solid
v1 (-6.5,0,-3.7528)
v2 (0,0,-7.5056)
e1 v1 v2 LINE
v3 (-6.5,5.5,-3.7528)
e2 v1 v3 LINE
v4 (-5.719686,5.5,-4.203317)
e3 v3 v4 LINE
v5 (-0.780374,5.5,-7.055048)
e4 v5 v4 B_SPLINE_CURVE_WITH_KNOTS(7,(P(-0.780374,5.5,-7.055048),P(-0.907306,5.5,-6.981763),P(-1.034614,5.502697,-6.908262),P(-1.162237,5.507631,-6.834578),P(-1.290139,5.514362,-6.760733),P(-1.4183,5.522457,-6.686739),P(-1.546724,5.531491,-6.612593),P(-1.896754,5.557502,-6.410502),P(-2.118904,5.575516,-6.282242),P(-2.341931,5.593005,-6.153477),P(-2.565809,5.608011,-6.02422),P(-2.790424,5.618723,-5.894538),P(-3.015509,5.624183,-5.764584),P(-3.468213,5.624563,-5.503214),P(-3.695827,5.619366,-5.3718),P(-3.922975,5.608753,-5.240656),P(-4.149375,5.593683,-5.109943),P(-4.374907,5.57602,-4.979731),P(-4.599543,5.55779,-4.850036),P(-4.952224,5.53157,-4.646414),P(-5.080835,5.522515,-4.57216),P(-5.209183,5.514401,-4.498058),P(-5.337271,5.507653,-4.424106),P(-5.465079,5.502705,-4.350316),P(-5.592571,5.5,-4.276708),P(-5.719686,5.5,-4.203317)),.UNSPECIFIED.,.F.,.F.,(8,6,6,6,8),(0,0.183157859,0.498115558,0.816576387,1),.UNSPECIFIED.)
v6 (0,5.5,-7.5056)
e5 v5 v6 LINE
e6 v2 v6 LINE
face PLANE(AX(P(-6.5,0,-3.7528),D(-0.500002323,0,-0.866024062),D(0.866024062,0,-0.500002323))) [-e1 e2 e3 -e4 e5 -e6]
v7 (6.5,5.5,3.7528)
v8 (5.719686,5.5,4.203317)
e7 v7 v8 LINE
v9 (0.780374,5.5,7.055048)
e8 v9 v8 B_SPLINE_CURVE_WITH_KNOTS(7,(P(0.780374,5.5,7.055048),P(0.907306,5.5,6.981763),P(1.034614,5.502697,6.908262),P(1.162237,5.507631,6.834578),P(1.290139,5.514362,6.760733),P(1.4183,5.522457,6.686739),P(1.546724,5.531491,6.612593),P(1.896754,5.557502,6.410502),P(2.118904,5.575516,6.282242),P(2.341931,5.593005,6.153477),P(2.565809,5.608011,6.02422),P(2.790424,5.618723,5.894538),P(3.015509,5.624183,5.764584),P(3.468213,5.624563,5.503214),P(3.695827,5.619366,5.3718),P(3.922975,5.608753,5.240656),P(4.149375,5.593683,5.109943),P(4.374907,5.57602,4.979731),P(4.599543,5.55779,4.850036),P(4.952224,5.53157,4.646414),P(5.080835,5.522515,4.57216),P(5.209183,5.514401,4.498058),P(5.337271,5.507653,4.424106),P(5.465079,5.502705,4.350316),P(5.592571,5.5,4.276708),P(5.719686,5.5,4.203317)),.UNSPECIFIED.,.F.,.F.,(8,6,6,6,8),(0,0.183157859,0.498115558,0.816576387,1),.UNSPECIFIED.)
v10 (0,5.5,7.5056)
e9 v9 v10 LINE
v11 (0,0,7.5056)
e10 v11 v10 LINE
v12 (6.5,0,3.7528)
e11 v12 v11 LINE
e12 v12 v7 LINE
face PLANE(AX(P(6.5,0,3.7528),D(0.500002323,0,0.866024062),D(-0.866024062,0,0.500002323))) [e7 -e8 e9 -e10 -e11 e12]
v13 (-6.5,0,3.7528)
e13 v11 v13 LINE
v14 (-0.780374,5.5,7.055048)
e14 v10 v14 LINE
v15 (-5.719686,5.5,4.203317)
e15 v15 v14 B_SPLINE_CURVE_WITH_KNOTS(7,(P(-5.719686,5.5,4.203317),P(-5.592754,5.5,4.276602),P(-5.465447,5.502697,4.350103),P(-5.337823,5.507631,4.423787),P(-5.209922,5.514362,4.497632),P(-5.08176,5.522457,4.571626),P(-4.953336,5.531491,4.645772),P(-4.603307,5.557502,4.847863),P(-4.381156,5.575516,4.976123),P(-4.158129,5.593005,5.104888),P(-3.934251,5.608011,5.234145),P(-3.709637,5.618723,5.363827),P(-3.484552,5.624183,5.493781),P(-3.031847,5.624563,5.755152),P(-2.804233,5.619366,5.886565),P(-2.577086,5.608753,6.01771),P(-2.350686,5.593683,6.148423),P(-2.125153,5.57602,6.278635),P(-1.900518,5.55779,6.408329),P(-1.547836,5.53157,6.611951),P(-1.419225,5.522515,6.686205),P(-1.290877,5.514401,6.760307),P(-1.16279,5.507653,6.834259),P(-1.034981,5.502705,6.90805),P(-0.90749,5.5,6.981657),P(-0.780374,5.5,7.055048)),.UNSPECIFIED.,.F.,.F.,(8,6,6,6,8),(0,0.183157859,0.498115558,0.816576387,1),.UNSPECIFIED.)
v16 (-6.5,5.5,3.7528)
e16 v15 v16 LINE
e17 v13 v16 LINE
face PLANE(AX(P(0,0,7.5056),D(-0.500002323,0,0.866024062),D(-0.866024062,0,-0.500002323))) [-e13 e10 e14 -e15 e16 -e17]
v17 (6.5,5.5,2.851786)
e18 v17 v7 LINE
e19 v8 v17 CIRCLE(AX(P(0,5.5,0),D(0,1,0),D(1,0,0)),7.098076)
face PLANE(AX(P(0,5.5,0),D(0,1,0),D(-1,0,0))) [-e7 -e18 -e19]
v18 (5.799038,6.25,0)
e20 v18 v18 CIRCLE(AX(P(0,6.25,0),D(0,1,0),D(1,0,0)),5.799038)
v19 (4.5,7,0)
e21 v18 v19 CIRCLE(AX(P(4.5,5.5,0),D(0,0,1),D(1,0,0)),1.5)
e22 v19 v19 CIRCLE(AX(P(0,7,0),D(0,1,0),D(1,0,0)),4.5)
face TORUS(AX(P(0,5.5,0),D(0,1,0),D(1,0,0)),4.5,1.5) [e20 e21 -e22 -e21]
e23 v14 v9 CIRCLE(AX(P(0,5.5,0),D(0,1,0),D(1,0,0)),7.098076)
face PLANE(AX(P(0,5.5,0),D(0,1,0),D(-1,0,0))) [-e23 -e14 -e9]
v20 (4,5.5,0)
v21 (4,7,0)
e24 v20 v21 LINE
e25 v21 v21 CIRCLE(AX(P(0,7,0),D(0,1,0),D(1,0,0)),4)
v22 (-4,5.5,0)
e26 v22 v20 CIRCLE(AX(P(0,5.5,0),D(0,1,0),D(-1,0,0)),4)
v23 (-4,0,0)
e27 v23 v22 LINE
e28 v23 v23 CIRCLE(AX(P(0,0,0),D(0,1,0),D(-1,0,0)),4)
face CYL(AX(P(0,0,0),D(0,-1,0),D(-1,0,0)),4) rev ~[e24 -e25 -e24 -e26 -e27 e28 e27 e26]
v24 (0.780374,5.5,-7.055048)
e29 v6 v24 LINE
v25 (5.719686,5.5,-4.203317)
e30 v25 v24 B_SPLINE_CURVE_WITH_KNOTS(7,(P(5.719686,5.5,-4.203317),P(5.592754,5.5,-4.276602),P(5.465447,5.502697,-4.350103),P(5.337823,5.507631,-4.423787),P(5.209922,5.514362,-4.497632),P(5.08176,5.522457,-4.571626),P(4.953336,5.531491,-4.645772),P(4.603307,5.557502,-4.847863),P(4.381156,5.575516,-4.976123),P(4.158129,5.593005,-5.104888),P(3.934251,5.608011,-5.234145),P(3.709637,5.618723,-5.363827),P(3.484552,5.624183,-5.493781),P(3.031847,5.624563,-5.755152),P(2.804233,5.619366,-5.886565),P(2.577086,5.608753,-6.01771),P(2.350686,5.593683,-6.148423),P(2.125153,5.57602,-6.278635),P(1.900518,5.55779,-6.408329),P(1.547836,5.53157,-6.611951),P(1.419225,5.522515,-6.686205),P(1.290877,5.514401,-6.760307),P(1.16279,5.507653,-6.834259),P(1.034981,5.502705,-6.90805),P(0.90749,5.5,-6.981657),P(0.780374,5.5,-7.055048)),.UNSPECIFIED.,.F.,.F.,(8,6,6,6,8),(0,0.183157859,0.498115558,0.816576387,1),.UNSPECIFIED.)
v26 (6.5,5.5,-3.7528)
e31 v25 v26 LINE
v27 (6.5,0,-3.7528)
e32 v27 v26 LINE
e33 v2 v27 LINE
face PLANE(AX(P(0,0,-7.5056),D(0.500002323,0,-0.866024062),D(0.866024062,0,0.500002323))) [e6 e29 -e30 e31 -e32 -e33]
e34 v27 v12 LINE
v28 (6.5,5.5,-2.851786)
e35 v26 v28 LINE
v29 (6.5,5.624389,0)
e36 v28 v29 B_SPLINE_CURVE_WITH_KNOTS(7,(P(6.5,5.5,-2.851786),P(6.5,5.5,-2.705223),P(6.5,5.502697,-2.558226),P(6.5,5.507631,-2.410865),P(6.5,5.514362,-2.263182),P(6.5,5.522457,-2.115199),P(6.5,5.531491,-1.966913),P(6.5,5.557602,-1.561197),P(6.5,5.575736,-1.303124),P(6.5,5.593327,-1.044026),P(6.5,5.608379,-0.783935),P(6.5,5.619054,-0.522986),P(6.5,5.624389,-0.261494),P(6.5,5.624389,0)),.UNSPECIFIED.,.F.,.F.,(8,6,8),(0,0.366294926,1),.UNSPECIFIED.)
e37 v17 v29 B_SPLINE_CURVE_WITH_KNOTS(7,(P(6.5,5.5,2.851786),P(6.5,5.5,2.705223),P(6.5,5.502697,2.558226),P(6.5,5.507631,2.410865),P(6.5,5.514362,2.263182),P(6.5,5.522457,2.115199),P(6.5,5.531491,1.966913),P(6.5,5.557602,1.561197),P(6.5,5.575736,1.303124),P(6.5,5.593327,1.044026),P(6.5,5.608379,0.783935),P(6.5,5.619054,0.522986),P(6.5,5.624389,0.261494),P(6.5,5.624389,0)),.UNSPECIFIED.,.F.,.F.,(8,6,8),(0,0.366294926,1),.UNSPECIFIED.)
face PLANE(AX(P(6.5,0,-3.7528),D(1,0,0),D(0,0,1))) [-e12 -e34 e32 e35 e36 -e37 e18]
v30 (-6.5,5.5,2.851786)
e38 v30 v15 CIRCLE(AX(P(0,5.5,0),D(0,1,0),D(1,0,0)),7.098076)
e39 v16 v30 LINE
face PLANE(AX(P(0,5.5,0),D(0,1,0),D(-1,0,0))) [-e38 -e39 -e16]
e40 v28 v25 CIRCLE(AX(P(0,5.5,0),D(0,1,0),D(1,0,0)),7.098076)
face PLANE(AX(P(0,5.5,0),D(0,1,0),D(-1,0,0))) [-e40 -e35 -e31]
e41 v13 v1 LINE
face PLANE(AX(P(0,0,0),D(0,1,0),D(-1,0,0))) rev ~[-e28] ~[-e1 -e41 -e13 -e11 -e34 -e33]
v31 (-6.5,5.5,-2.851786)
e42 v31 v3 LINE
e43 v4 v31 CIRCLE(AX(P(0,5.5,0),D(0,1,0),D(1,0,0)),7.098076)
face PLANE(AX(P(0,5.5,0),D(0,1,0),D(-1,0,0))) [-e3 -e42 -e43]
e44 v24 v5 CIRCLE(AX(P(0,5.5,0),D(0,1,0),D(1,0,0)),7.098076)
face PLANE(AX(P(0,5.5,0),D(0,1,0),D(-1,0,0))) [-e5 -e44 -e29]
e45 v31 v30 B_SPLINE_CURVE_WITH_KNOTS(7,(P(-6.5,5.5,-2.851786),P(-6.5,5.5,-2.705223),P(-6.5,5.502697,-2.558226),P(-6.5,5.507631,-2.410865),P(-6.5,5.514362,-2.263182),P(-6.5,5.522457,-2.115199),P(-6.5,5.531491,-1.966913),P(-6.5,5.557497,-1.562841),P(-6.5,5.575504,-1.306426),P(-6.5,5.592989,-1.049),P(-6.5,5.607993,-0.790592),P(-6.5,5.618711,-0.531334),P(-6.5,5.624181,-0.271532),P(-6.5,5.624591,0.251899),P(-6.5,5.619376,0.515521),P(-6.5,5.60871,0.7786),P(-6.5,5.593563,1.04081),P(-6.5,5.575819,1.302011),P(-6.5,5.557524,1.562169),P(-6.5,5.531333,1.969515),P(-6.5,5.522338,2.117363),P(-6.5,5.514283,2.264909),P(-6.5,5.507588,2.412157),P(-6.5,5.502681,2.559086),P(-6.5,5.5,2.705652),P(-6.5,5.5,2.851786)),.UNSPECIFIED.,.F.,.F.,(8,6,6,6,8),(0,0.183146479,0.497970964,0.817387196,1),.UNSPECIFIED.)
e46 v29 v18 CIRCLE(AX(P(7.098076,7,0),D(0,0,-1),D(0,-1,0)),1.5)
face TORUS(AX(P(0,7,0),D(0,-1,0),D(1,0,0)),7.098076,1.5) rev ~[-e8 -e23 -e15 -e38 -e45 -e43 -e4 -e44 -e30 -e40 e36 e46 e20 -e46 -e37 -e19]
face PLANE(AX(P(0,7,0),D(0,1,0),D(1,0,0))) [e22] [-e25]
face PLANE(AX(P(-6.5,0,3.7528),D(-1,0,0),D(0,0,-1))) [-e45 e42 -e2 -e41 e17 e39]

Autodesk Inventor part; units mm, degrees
ref_plane "YZ Plane" through (0, 0, 0) normal (1, 0, 0) x (0, 1, 0)
ref_plane "XZ Plane" through (0, 0, 0) normal (0, 1, 0) x (-1, 0, 0)
ref_plane "XY Plane" through (0, 0, 0) normal (0, 0, 1) x (1, 0, 0)
sketch "Sketch1" plane through (0, 0, 0) normal (0, 1, 0) x (-1, 0, 0)
  circle A0 centre (0, 0) radius 4
  line L0 (0, -7.5056) -> (-6.5, -3.7528)
  line L1 (-6.5, -3.7528) -> (-6.5, 3.7528)
  line L2 (-6.5, 3.7528) -> (0, 7.5056)
  line L3 (0, 7.5056) -> (6.5, 3.7528)
  line L4 (6.5, 3.7528) -> (6.5, -3.7528)
  line L5 (6.5, -3.7528) -> (0, -7.5056)
  dimension "d0" = 8
  dimension "d1" = 13
extrude "Extrusion1" add sketch "Sketch1" along normal blind 5.5
sketch "Sketch2" plane through (0, 5.5, 0) normal (0, 1, 0) x (1, 0, 0)
  circle A0 centre (0, 0) radius 4 projected
  circle A1 centre (0, 0) radius 6
  dimension "d6" = 2
extrude "Extrusion2" add sketch "Sketch2" along normal blind 1.5
fillet "Fillet1" radius 1.5 2 edges at (-6, 7, 0) (-6, 5.5, 0)
thread "Thread2" size "M8x1.25" class "6H" standard "ANSI Metric M Profile" full length
properties part number "Mutter"
